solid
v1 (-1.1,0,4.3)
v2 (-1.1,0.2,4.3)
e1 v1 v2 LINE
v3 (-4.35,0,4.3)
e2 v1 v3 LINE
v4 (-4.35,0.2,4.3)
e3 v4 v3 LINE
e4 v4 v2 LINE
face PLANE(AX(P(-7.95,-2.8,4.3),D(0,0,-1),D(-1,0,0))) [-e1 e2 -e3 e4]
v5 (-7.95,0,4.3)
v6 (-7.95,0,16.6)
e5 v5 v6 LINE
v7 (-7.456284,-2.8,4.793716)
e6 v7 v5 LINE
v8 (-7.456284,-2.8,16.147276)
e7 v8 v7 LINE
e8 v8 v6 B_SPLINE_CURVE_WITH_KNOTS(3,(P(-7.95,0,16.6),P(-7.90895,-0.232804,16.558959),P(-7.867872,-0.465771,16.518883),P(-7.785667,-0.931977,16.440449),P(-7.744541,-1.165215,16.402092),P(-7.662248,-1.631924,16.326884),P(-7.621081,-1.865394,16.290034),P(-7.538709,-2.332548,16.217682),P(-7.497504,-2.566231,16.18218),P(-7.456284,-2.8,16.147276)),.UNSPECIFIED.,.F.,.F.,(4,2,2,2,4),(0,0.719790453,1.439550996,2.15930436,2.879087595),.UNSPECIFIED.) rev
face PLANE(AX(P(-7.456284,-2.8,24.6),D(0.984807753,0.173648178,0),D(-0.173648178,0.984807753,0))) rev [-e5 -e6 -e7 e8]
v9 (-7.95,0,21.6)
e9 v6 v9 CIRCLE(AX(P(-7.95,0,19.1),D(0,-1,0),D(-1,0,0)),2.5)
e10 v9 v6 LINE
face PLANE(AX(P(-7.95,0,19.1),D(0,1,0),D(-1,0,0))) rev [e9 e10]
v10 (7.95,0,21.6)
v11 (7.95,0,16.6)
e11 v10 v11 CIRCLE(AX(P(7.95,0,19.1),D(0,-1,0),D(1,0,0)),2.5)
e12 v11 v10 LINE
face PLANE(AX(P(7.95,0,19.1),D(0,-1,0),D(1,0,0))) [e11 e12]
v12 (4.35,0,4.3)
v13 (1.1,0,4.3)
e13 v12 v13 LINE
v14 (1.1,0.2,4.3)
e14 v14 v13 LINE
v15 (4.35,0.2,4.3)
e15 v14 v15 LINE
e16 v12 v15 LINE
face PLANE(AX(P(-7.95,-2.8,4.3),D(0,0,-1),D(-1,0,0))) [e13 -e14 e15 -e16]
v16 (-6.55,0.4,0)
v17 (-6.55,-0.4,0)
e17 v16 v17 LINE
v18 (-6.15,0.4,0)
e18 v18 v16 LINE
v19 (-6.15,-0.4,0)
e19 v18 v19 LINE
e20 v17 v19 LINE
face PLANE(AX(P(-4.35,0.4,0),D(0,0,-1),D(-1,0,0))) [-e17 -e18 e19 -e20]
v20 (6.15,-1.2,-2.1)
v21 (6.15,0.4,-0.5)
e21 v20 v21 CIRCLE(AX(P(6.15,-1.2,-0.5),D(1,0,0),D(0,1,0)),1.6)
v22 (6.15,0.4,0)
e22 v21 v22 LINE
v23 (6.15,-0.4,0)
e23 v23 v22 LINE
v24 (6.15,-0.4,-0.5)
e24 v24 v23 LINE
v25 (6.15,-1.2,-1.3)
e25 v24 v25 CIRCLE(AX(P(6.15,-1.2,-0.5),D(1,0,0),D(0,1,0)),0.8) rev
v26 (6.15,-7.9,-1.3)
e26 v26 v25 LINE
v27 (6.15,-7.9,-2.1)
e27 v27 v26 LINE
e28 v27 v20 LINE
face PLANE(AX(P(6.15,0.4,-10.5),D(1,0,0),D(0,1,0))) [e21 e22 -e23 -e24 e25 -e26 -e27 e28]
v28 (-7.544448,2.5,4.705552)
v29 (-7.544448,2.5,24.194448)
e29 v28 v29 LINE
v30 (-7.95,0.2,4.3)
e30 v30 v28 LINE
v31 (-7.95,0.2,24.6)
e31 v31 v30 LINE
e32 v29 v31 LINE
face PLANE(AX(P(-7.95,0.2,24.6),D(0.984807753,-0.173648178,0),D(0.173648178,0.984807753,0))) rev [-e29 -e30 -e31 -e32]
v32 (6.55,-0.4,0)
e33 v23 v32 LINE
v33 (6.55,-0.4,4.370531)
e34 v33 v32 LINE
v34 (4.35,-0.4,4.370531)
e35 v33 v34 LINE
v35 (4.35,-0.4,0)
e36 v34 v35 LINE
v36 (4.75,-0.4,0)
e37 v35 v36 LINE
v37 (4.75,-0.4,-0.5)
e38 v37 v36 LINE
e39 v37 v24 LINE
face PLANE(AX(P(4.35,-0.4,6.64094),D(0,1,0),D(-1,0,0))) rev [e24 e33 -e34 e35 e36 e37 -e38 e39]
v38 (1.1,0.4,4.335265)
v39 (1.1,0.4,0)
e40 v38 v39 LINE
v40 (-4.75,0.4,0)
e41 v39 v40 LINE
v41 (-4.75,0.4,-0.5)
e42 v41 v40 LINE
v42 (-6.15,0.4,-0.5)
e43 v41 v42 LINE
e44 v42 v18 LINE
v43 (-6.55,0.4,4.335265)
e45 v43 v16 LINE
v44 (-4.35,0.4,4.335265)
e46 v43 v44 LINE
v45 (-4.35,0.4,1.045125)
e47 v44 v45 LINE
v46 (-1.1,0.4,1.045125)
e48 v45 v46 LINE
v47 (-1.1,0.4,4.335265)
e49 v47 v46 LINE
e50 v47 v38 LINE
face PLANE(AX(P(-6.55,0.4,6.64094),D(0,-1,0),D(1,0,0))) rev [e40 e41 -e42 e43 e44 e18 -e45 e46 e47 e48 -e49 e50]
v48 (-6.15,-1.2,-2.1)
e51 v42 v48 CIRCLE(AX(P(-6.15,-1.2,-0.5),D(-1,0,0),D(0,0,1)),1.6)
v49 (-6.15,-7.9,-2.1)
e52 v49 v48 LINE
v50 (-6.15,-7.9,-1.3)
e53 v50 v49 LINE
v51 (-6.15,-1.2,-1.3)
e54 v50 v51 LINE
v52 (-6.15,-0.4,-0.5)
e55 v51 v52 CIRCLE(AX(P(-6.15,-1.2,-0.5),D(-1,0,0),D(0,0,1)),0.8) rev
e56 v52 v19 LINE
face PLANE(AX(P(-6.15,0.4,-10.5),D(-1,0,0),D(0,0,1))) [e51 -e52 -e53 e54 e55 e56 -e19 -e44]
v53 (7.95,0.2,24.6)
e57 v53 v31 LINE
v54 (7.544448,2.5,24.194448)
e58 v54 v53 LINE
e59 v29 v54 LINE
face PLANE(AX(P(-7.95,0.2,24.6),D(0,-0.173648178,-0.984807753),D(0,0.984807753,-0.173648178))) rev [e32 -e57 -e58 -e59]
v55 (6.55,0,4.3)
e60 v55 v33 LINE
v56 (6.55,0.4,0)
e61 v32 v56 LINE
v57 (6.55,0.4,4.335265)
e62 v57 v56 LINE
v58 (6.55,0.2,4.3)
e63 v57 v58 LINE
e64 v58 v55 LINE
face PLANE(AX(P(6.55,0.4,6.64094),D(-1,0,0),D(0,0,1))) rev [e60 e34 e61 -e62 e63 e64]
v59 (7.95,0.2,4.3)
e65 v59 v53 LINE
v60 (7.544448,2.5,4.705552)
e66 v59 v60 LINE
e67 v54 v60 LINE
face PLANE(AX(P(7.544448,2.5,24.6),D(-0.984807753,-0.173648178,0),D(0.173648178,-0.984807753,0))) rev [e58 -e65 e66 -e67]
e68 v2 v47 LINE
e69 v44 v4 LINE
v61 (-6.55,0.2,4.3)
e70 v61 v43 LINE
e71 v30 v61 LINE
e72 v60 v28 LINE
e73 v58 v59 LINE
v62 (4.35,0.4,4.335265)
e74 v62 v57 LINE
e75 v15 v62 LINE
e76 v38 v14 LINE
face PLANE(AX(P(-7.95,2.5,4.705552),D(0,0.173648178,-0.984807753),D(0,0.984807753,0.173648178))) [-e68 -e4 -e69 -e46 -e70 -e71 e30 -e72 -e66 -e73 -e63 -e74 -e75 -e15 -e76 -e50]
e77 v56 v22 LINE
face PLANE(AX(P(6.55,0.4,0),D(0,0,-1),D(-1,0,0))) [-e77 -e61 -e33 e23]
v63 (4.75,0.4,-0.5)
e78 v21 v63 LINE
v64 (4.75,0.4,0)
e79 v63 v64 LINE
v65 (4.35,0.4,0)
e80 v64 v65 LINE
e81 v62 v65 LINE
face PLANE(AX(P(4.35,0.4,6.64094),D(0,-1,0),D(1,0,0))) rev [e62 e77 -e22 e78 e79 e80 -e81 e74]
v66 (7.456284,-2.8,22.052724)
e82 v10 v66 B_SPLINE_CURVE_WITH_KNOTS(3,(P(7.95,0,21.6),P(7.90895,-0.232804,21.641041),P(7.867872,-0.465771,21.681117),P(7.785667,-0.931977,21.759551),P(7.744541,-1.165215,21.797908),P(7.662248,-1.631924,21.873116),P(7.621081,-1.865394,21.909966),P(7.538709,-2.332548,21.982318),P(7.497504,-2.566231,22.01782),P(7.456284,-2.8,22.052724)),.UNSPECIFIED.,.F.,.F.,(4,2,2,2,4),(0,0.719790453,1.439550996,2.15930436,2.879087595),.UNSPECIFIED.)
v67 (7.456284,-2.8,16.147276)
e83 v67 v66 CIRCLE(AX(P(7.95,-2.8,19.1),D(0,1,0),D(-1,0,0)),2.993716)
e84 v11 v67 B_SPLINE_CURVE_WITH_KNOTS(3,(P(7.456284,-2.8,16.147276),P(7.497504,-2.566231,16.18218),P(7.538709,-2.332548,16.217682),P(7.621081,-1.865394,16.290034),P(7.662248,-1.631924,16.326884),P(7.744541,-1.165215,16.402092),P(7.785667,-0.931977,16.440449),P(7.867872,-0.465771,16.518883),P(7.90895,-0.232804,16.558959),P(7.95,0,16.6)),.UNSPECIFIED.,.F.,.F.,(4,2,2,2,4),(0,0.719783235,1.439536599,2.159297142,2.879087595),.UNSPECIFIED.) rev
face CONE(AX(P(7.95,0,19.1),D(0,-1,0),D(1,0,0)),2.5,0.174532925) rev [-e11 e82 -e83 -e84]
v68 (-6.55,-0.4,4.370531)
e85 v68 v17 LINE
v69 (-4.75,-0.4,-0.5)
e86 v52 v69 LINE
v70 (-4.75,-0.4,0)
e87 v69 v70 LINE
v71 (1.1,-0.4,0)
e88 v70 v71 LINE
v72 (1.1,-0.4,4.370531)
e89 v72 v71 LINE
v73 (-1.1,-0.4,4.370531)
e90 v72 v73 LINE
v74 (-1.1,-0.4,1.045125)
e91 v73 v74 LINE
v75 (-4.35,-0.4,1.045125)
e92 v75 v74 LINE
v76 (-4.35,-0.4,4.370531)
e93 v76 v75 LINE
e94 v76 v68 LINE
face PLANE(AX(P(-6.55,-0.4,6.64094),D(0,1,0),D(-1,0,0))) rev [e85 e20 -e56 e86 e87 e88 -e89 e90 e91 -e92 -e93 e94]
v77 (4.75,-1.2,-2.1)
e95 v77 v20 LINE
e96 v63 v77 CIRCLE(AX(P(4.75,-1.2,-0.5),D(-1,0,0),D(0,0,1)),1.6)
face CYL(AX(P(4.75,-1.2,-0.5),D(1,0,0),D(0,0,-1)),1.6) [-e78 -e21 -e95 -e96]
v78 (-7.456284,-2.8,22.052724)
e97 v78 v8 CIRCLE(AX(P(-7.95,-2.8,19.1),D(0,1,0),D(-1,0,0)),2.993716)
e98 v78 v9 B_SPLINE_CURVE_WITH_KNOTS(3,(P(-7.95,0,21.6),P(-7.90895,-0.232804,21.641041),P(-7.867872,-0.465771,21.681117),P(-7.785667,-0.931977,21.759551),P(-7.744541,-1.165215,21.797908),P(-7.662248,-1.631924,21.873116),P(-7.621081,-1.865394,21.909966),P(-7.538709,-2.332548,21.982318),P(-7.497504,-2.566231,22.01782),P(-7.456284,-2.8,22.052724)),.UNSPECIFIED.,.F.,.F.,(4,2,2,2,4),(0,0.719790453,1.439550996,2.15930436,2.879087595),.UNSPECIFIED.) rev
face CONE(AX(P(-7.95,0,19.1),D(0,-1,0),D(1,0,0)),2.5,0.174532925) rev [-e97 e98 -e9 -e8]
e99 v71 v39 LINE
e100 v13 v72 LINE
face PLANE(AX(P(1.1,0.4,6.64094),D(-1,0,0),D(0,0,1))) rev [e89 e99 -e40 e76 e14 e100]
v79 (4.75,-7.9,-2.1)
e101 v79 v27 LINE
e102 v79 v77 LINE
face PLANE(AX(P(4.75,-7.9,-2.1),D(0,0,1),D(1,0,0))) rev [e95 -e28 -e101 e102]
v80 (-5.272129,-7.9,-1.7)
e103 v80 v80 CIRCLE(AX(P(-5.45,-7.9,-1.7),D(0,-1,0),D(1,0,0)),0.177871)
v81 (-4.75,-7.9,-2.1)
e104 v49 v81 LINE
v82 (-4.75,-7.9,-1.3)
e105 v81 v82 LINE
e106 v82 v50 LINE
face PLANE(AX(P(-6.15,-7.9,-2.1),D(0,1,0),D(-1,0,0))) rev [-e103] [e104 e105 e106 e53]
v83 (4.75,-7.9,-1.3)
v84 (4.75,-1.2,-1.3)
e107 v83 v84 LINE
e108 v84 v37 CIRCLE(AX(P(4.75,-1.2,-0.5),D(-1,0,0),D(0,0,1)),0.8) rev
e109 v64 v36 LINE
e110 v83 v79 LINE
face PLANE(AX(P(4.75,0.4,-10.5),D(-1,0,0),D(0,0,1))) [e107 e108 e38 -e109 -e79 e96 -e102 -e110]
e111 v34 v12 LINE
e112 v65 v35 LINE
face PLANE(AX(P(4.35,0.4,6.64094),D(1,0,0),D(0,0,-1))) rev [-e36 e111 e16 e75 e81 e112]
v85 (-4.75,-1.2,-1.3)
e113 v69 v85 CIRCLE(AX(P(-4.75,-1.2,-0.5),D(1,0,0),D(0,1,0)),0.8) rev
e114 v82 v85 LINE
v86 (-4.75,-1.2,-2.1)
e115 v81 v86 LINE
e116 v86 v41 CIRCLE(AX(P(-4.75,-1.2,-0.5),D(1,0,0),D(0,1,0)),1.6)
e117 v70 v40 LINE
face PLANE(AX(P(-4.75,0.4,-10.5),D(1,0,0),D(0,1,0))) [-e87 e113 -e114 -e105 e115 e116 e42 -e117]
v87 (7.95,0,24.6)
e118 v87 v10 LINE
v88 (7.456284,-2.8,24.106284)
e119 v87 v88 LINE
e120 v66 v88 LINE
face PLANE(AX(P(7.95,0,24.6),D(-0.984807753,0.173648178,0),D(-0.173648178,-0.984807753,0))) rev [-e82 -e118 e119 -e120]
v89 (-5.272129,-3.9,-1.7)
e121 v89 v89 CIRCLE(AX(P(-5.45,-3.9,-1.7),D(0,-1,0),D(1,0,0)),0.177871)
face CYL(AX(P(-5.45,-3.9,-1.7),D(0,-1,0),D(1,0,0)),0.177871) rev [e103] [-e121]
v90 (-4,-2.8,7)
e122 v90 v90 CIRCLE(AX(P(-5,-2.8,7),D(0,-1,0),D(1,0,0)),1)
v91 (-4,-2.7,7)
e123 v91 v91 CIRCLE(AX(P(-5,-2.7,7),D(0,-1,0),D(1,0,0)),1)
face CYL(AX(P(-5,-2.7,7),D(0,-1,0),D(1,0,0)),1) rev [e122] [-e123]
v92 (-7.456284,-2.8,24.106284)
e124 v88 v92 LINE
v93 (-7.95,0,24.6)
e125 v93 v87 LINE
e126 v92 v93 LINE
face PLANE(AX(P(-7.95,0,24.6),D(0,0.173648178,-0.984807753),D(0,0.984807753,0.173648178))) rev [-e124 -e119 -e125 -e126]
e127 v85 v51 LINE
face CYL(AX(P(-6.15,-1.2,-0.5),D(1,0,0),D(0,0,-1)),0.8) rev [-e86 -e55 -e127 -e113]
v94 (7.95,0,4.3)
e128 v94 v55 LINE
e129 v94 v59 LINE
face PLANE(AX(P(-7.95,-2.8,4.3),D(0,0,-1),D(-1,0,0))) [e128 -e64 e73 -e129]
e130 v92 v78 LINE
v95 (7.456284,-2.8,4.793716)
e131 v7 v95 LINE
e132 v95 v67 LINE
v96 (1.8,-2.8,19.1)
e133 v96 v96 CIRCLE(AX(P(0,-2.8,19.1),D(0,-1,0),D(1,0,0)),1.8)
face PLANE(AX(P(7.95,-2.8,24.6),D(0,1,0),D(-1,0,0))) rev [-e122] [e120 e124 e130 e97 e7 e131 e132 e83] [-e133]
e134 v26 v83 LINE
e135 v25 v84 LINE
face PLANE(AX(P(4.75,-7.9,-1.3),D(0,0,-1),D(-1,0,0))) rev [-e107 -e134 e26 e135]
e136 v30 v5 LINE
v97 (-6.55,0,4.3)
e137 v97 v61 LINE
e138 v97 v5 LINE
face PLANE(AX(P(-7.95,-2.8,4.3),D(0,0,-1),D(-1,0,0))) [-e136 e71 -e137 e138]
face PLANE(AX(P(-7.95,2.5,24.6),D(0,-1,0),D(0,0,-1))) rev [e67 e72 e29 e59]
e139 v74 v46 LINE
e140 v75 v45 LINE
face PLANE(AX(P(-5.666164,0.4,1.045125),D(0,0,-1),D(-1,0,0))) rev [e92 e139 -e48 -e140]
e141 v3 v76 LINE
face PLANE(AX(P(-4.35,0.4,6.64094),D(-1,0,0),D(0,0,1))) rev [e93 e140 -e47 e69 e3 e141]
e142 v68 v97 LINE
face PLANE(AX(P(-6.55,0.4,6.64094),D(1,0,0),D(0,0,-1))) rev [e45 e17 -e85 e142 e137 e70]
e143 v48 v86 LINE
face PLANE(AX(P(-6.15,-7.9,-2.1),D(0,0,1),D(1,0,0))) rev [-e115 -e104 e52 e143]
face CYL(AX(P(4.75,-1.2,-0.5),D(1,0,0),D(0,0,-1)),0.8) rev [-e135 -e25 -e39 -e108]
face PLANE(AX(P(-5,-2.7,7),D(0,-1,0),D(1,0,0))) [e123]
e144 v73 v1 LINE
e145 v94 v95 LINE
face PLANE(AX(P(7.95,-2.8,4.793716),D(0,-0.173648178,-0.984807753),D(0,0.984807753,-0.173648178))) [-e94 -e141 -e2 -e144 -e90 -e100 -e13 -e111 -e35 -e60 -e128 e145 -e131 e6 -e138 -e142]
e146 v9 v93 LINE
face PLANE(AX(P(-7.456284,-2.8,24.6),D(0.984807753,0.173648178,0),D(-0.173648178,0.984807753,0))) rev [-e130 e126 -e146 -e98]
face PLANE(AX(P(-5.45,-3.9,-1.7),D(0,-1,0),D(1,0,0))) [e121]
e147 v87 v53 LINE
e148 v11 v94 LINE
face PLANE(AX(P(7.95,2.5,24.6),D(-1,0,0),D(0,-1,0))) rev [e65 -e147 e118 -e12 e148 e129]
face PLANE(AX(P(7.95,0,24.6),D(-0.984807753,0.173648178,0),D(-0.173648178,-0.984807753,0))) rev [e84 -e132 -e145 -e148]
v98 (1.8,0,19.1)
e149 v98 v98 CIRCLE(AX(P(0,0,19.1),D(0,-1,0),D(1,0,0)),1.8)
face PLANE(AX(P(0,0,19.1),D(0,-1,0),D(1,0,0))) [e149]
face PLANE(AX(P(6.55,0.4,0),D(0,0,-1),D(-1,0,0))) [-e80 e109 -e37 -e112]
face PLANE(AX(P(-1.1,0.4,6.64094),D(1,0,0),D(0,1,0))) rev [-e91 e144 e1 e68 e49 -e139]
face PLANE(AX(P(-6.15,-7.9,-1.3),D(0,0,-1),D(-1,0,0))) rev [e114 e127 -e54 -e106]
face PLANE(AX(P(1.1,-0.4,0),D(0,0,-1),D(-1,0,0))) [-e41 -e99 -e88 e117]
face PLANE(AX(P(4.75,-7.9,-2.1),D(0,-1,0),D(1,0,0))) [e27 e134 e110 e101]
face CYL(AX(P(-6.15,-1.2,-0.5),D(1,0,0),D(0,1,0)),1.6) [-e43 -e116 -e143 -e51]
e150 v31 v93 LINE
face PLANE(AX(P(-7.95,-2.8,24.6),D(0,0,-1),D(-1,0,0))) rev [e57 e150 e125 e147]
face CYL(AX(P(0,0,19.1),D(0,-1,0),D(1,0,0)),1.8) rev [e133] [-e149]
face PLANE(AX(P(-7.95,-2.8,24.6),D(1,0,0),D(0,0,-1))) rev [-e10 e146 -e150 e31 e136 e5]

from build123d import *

# Parameters (mm, degrees)
SKETCH_3_W          = 15.9
SKETCH_3_H          = 5.3
EXTRUDE_1_DEPTH     = 20.3
SKETCH_4_W          = 2.2
SKETCH_4_H          = 0.8
EXTRUDE_2_DEPTH     = 4.3
SKETCH_6_W          = 1.4
SKETCH_6_H          = 0.8
EXTRUDE_3_DEPTH     = 10.5
SKETCH_7_R          = 1.8
CUT_EXTRUDE_1_DEPTH = 2.8
SKETCH_8_R          = 1
CUT_EXTRUDE_2_DEPTH = 0.1
CHAMFER_1_SIZE      = 2.8
CHAMFER_1_SIZE_2    = 0.493715546
CHAMFER_2_SIZE      = 0.405552056
CHAMFER_2_SIZE_2    = 2.3
SKETCH_9_W          = 1.4
SKETCH_9_H          = 0.8
CUT_EXTRUDE_3_DEPTH = 10.5
SKETCH_10_W         = 1.045125196
SKETCH_10_H         = 0.8
EXTRUDE_4_DEPTH     = 3.25
SKETCH_11_W         = 1.4
SKETCH_11_H         = 0.8
EXTRUDE_5_DEPTH     = 7.5
SKETCH_12_W         = 1.4
SKETCH_12_H         = 0.8
CUT_EXTRUDE_4_DEPTH = 8.4
FILLET_1_R          = 0.8
FILLET_2_R          = 1.6
SKETCH_13_R         = 0.177871301
CUT_EXTRUDE_5_DEPTH = 4


with BuildPart() as part:
    # Эскиз3 → Вытянуть1 (new body)
    with BuildSketch(Plane.XY.offset(4.3)):
        with Locations((0, -0.15)):
            Rectangle(SKETCH_3_W, SKETCH_3_H)
    extrude(amount=EXTRUDE_1_DEPTH)

    # Эскиз4 → Вытянуть2 (add)
    with BuildSketch(Plane.XY):
        Rectangle(SKETCH_4_W, SKETCH_4_H)
        with Locations((-5.45, 0)):
            Rectangle(SKETCH_4_W, SKETCH_4_H)
        with Locations((5.45, 0)):
            Rectangle(SKETCH_4_W, SKETCH_4_H)
    extrude(amount=EXTRUDE_2_DEPTH)

    # Эскиз6 → Вытянуть3 (add)
    with BuildSketch(Plane.XY):
        Rectangle(SKETCH_6_W, SKETCH_6_H)
        with Locations((-5.45, 0)):
            Rectangle(SKETCH_6_W, SKETCH_6_H)
        with Locations((5.45, 0)):
            Rectangle(SKETCH_6_W, SKETCH_6_H)
    extrude(amount=-EXTRUDE_3_DEPTH)

    # Эскиз7 → Вырез-Вытянуть1 (cut)
    with BuildSketch(Plane.XZ.offset(2.8)):
        with Locations((0, 19.1)):
            Circle(SKETCH_7_R)
        with BuildLine():
            Line((7.95, 16.6), (7.95, 21.6))
            ThreePointArc((7.95, 21.6), (5.45, 19.1), (7.95, 16.6))
        make_face()
        with BuildLine():
            Line((-7.95, 16.6), (-7.95, 21.6))
            ThreePointArc((-7.95, 21.6), (-5.45, 19.1), (-7.95, 16.6))
        make_face()
    extrude(amount=-CUT_EXTRUDE_1_DEPTH, mode=Mode.SUBTRACT)

    # Эскиз8 → Вырез-Вытянуть2 (cut)
    with BuildSketch(Plane.XZ.offset(2.8)):
        with Locations((-5, 7)):
            Circle(SKETCH_8_R)
    extrude(amount=-CUT_EXTRUDE_2_DEPTH, mode=Mode.SUBTRACT)

    # Фаска1
    # the kernel refuses this chamfer: 2.8, 0.493715546 mm, written as the material it takes off along each edge
    with BuildSketch(Plane(origin=(15.22590863, -2.8, 4.3), x_dir=(0, 0.9999776716360547, -0.006682531656101734), z_dir=(-1, 0, 0))) as chamfer_1_piece_1_section:
        Polygon((CHAMFER_1_SIZE * 0.999977671636, -CHAMFER_1_SIZE * 0.0066825316561), (-CHAMFER_1_SIZE_2 * 0.00668253165588, -CHAMFER_1_SIZE_2 * 0.999977671603), (0, 0), align=None)
    chamfer_1_piece_1 = extrude(amount=30.45181726, mode=Mode.PRIVATE)
    chamfer_1_piece_1 = split(chamfer_1_piece_1, bisect_by=Plane(origin=(6.55, -0.266666667, 4.323510264), z_dir=(1, 0, 0)), keep=Keep.TOP, mode=Mode.PRIVATE)
    add(chamfer_1_piece_1, mode=Mode.SUBTRACT)
    with BuildSketch(Plane(origin=(15.22590863, -2.8, 4.3), x_dir=(0, 0.9999776716360547, -0.006682531656101734), z_dir=(-1, 0, 0))) as chamfer_1_piece_2_section:
        Polygon((CHAMFER_1_SIZE * 0.999977671636, -CHAMFER_1_SIZE * 0.0066825316561), (-CHAMFER_1_SIZE_2 * 0.00668253165588, -CHAMFER_1_SIZE_2 * 0.999977671603), (0, 0), align=None)
    chamfer_1_piece_2 = extrude(amount=30.45181726, mode=Mode.PRIVATE)
    chamfer_1_piece_2 = split(chamfer_1_piece_2, bisect_by=Plane(origin=(5.45, -0.4, 4.467510632), z_dir=(0, -1, 0)), keep=Keep.TOP, mode=Mode.PRIVATE)
    add(chamfer_1_piece_2, mode=Mode.SUBTRACT)
    with BuildSketch(Plane(origin=(15.22590863, -2.8, 4.3), x_dir=(0, 0.9999776716360547, -0.006682531656101734), z_dir=(-1, 0, 0))) as chamfer_1_piece_3_section:
        Polygon((CHAMFER_1_SIZE * 0.999977671636, -CHAMFER_1_SIZE * 0.0066825316561), (-CHAMFER_1_SIZE_2 * 0.00668253165588, -CHAMFER_1_SIZE_2 * 0.999977671603), (0, 0), align=None)
    chamfer_1_piece_3 = extrude(amount=30.45181726, mode=Mode.PRIVATE)
    chamfer_1_piece_3 = split(chamfer_1_piece_3, bisect_by=Plane(origin=(4.35, -0.266666667, 4.323510264), z_dir=(-1, 0, 0)), keep=Keep.TOP, mode=Mode.PRIVATE)
    chamfer_1_piece_3 = split(chamfer_1_piece_3, bisect_by=Plane(origin=(1.1, -0.266666667, 4.323510264), z_dir=(1, 0, 0)), keep=Keep.TOP, mode=Mode.PRIVATE)
    add(chamfer_1_piece_3, mode=Mode.SUBTRACT)
    with BuildSketch(Plane(origin=(15.22590863, -2.8, 4.3), x_dir=(0, 0.9999776716360547, -0.006682531656101734), z_dir=(-1, 0, 0))) as chamfer_1_piece_4_section:
        Polygon((CHAMFER_1_SIZE * 0.999977671636, -CHAMFER_1_SIZE * 0.0066825316561), (-CHAMFER_1_SIZE_2 * 0.00668253165588, -CHAMFER_1_SIZE_2 * 0.999977671603), (0, 0), align=None)
    chamfer_1_piece_4 = extrude(amount=30.45181726, mode=Mode.PRIVATE)
    chamfer_1_piece_4 = split(chamfer_1_piece_4, bisect_by=Plane(origin=(-4.35, -0.266666667, 4.323510264), z_dir=(1, 0, 0)), keep=Keep.TOP, mode=Mode.PRIVATE)
    chamfer_1_piece_4 = split(chamfer_1_piece_4, bisect_by=Plane(origin=(-1.1, -0.266666667, 4.323510264), z_dir=(-1, 0, 0)), keep=Keep.TOP, mode=Mode.PRIVATE)
    add(chamfer_1_piece_4, mode=Mode.SUBTRACT)
    with BuildSketch(Plane(origin=(15.22590863, -2.8, 4.3), x_dir=(0, 0.9999776716360547, -0.006682531656101734), z_dir=(-1, 0, 0))) as chamfer_1_piece_5_section:
        Polygon((CHAMFER_1_SIZE * 0.999977671636, -CHAMFER_1_SIZE * 0.0066825316561), (-CHAMFER_1_SIZE_2 * 0.00668253165588, -CHAMFER_1_SIZE_2 * 0.999977671603), (0, 0), align=None)
    chamfer_1_piece_5 = extrude(amount=30.45181726, mode=Mode.PRIVATE)
    chamfer_1_piece_5 = split(chamfer_1_piece_5, bisect_by=Plane(origin=(-6.55, -0.266666667, 4.323510264), z_dir=(-1, 0, 0)), keep=Keep.TOP, mode=Mode.PRIVATE)
    add(chamfer_1_piece_5, mode=Mode.SUBTRACT)
    with BuildSketch(Plane(origin=(-7.95, -2.8, -2.97590863), x_dir=(-0.006682531656101734, 0.9999776716360547, 0), z_dir=(0, 0, 1))) as chamfer_1_piece_6:
        Polygon((CHAMFER_1_SIZE * 0.999977671636, -CHAMFER_1_SIZE * 0.0066825316561), (-CHAMFER_1_SIZE_2 * 0.00668253165588, -CHAMFER_1_SIZE_2 * 0.999977671603), (0, 0), align=None)
    extrude(amount=26.85181726, mode=Mode.SUBTRACT)
    with BuildSketch(Plane(origin=(-7.95, -2.8, 14.32409137), x_dir=(-0.006682531656101734, 0.9999776716360547, 0), z_dir=(0, 0, 1))) as chamfer_1_piece_7:
        Polygon((CHAMFER_1_SIZE * 0.999977671636, -CHAMFER_1_SIZE * 0.0066825316561), (-CHAMFER_1_SIZE_2 * 0.00668253165588, -CHAMFER_1_SIZE_2 * 0.999977671603), (0, 0), align=None)
    extrude(amount=17.55181726, mode=Mode.SUBTRACT)
    with BuildSketch(Plane(origin=(-7.95, -2.8, 19.1), x_dir=(-0.9999950652018581, 0, 0.0031415874858794286), z_dir=(-0.0031415874858794286, 0, -0.9999950652018581))) as chamfer_1_piece_8:
        Polygon((2.5 + CHAMFER_1_SIZE_2, 0), (2.5, CHAMFER_1_SIZE), (2.5, 0), align=None)
    revolve(axis=Axis((-7.95, -2.8, 19.1), (0, 1, 0)), revolution_arc=359.64, mode=Mode.SUBTRACT)
    with BuildSketch(Plane(origin=(15.22590863, -2.8, 24.6), x_dir=(0, 0.9999776716360547, 0.006682531656101123), z_dir=(-1, 0, 0))) as chamfer_1_piece_9:
        Polygon((CHAMFER_1_SIZE * 0.999977671636, CHAMFER_1_SIZE * 0.0066825316561), (-CHAMFER_1_SIZE_2 * 0.00668253165588, CHAMFER_1_SIZE_2 * 0.999977671603), (0, 0), align=None)
    extrude(amount=30.45181726, mode=Mode.SUBTRACT)
    with BuildSketch(Plane(origin=(7.95, -2.8, 14.32409137), x_dir=(-0.9776715712462587, -0.21013876076743054, 0), z_dir=(0, 0, 1))) as chamfer_1_piece_10:
        Polygon((CHAMFER_1_SIZE_2 * 0.977671571214, -CHAMFER_1_SIZE_2 * 0.21013876076), (-CHAMFER_1_SIZE * 0.210138760767, -CHAMFER_1_SIZE * 0.977671571246), (0, 0), align=None)
    extrude(amount=17.55181726, mode=Mode.SUBTRACT)
    with BuildSketch(Plane(origin=(7.95, -2.8, -2.97590863), x_dir=(-0.9776715712462587, -0.21013876076743054, 0), z_dir=(0, 0, 1))) as chamfer_1_piece_11:
        Polygon((CHAMFER_1_SIZE_2 * 0.977671571214, -CHAMFER_1_SIZE_2 * 0.21013876076), (-CHAMFER_1_SIZE * 0.210138760767, -CHAMFER_1_SIZE * 0.977671571246), (0, 0), align=None)
    extrude(amount=26.85181726, mode=Mode.SUBTRACT)
    with BuildSketch(Plane(origin=(7.95, -2.8, 19.1), x_dir=(0.9999950652018581, 0, 0.0031415874858794286), z_dir=(0.0031415874858794286, 0, -0.9999950652018581))) as chamfer_1_piece_12:
        Polygon((2.5 + CHAMFER_1_SIZE_2, 0), (2.5, -CHAMFER_1_SIZE), (2.5, 0), align=None)
    revolve(axis=Axis((7.95, -2.8, 19.1), (0, -1, 0)), revolution_arc=359.64, mode=Mode.SUBTRACT)

    # Фаска2
    # the kernel refuses this chamfer: 2.3, 0.405552056 mm, written as the material it takes off along each edge
    with BuildSketch(Plane(origin=(7.95, 2.5, -1.676639232), x_dir=(-0.9776715712462586, 0.21013876076743143, 0), z_dir=(0, 0, 1))) as chamfer_2_piece_1:
        Polygon((CHAMFER_2_SIZE * 0.977671570353, CHAMFER_2_SIZE * 0.210138760575), (-CHAMFER_2_SIZE_2 * 0.210138760767, CHAMFER_2_SIZE_2 * 0.977671571246), (0, 0), align=None)
    extrude(amount=32.253278464, mode=Mode.SUBTRACT)
    with BuildSketch(Plane(origin=(-13.926639232, 2.5, 24.6), x_dir=(0, -0.9999776716360546, 0.0066825316561023975), z_dir=(1, 0, 0))) as chamfer_2_piece_2:
        Polygon((CHAMFER_2_SIZE_2 * 0.999977671636, CHAMFER_2_SIZE_2 * 0.0066825316561), (-CHAMFER_2_SIZE * 0.00668253165, CHAMFER_2_SIZE * 0.999977670722), (0, 0), align=None)
    extrude(amount=27.853278464, mode=Mode.SUBTRACT)
    with BuildSketch(Plane(origin=(-7.95, 2.5, -1.676639232), x_dir=(-0.006682531656101655, -0.9999776716360548, 0), z_dir=(0, 0, 1))) as chamfer_2_piece_3:
        Polygon((CHAMFER_2_SIZE_2 * 0.999977671636, CHAMFER_2_SIZE_2 * 0.0066825316561), (-CHAMFER_2_SIZE * 0.00668253165, CHAMFER_2_SIZE * 0.999977670722), (0, 0), align=None)
    extrude(amount=32.253278464, mode=Mode.SUBTRACT)
    with BuildSketch(Plane(origin=(-13.926639232, 2.5, 4.3), x_dir=(0, -0.9999776716360546, -0.006682531656101654), z_dir=(1, 0, 0))) as chamfer_2_piece_4_section:
        Polygon((CHAMFER_2_SIZE_2 * 0.999977671636, -CHAMFER_2_SIZE_2 * 0.0066825316561), (-CHAMFER_2_SIZE * 0.00668253165, -CHAMFER_2_SIZE * 0.999977670722), (0, 0), align=None)
    chamfer_2_piece_4 = extrude(amount=27.853278464, mode=Mode.PRIVATE)
    chamfer_2_piece_4 = split(chamfer_2_piece_4, bisect_by=Plane(origin=(-6.55, 0.333333333, 4.311755132), z_dir=(-1, 0, 0)), keep=Keep.TOP, mode=Mode.PRIVATE)
    add(chamfer_2_piece_4, mode=Mode.SUBTRACT)
    with BuildSketch(Plane(origin=(-13.926639232, 2.5, 4.3), x_dir=(0, -0.9999776716360546, -0.006682531656101654), z_dir=(1, 0, 0))) as chamfer_2_piece_5_section:
        Polygon((CHAMFER_2_SIZE_2 * 0.999977671636, -CHAMFER_2_SIZE_2 * 0.0066825316561), (-CHAMFER_2_SIZE * 0.00668253165, -CHAMFER_2_SIZE * 0.999977670722), (0, 0), align=None)
    chamfer_2_piece_5 = extrude(amount=27.853278464, mode=Mode.PRIVATE)
    chamfer_2_piece_5 = split(chamfer_2_piece_5, bisect_by=Plane(origin=(-5.45, 0.4, 4.436124429), z_dir=(0, 1, 0)), keep=Keep.TOP, mode=Mode.PRIVATE)
    add(chamfer_2_piece_5, mode=Mode.SUBTRACT)
    with BuildSketch(Plane(origin=(-13.926639232, 2.5, 4.3), x_dir=(0, -0.9999776716360546, -0.006682531656101654), z_dir=(1, 0, 0))) as chamfer_2_piece_6_section:
        Polygon((CHAMFER_2_SIZE_2 * 0.999977671636, -CHAMFER_2_SIZE_2 * 0.0066825316561), (-CHAMFER_2_SIZE * 0.00668253165, -CHAMFER_2_SIZE * 0.999977670722), (0, 0), align=None)
    chamfer_2_piece_6 = extrude(amount=27.853278464, mode=Mode.PRIVATE)
    chamfer_2_piece_6 = split(chamfer_2_piece_6, bisect_by=Plane(origin=(-4.35, 0.333333333, 4.311755132), z_dir=(1, 0, 0)), keep=Keep.TOP, mode=Mode.PRIVATE)
    chamfer_2_piece_6 = split(chamfer_2_piece_6, bisect_by=Plane(origin=(-1.1, 0.333333333, 4.311755132), z_dir=(-1, 0, 0)), keep=Keep.TOP, mode=Mode.PRIVATE)
    add(chamfer_2_piece_6, mode=Mode.SUBTRACT)
    with BuildSketch(Plane(origin=(-13.926639232, 2.5, 4.3), x_dir=(0, -0.9999776716360546, -0.006682531656101654), z_dir=(1, 0, 0))) as chamfer_2_piece_7_section:
        Polygon((CHAMFER_2_SIZE_2 * 0.999977671636, -CHAMFER_2_SIZE_2 * 0.0066825316561), (-CHAMFER_2_SIZE * 0.00668253165, -CHAMFER_2_SIZE * 0.999977670722), (0, 0), align=None)
    chamfer_2_piece_7 = extrude(amount=27.853278464, mode=Mode.PRIVATE)
    chamfer_2_piece_7 = split(chamfer_2_piece_7, bisect_by=Plane(origin=(1.1, 0.333333333, 4.311755132), z_dir=(1, 0, 0)), keep=Keep.TOP, mode=Mode.PRIVATE)
    chamfer_2_piece_7 = split(chamfer_2_piece_7, bisect_by=Plane(origin=(4.35, 0.333333333, 4.311755132), z_dir=(-1, 0, 0)), keep=Keep.TOP, mode=Mode.PRIVATE)
    add(chamfer_2_piece_7, mode=Mode.SUBTRACT)
    with BuildSketch(Plane(origin=(-13.926639232, 2.5, 4.3), x_dir=(0, -0.9999776716360546, -0.006682531656101654), z_dir=(1, 0, 0))) as chamfer_2_piece_8_section:
        Polygon((CHAMFER_2_SIZE_2 * 0.999977671636, -CHAMFER_2_SIZE_2 * 0.0066825316561), (-CHAMFER_2_SIZE * 0.00668253165, -CHAMFER_2_SIZE * 0.999977670722), (0, 0), align=None)
    chamfer_2_piece_8 = extrude(amount=27.853278464, mode=Mode.PRIVATE)
    chamfer_2_piece_8 = split(chamfer_2_piece_8, bisect_by=Plane(origin=(6.55, 0.333333333, 4.311755132), z_dir=(1, 0, 0)), keep=Keep.TOP, mode=Mode.PRIVATE)
    add(chamfer_2_piece_8, mode=Mode.SUBTRACT)

    # Эскиз9 → Вырез-Вытянуть3 (cut)
    with BuildSketch(Plane(origin=(0, 0, -10.5), x_dir=(-1, 0, 0), z_dir=(0, 0, -1))):
        Rectangle(SKETCH_9_W, SKETCH_9_H)
    extrude(amount=-CUT_EXTRUDE_3_DEPTH, mode=Mode.SUBTRACT)

    # Эскиз10 → Вытянуть4 (add)
    with BuildSketch(Plane.ZY.offset(1.1)):
        with Locations((0.522562598, 0)):
            Rectangle(SKETCH_10_W, SKETCH_10_H)
    extrude(amount=EXTRUDE_4_DEPTH)

    # Эскиз11 → Вытянуть5 (add)
    with BuildSketch(Plane.XZ.offset(0.4)):
        with Locations((-5.45, -1.7)):
            Rectangle(SKETCH_11_W, SKETCH_11_H)
        with Locations((5.45, -1.7)):
            Rectangle(SKETCH_11_W, SKETCH_11_H)
    extrude(amount=EXTRUDE_5_DEPTH)

    # Эскиз12 → Вырез-Вытянуть4 (cut)
    with BuildSketch(Plane(origin=(0, 0, -10.5), x_dir=(-1, 0, 0), z_dir=(0, 0, -1))):
        with Locations((5.45, 0)):
            Rectangle(SKETCH_12_W, SKETCH_12_H)
        with Locations((-5.45, 0)):
            Rectangle(SKETCH_12_W, SKETCH_12_H)
    extrude(amount=-CUT_EXTRUDE_4_DEPTH, mode=Mode.SUBTRACT)

    # Скругление1
    fillet_1_edges = [part.edges().sort_by_distance(p)[0] for p in [
        (5.45, -0.4, -1.3),
        (-5.45, -0.4, -1.3),
    ]]
    fillet(fillet_1_edges, radius=FILLET_1_R)

    # Скругление2
    fillet_2_edges = [part.edges().sort_by_distance(p)[0] for p in [
        (5.45, 0.4, -2.1),
        (-5.45, 0.4, -2.1),
    ]]
    fillet(fillet_2_edges, radius=FILLET_2_R)

    # Эскиз13 → Вырез-Вытянуть5 (cut)
    with BuildSketch(Plane.XZ.offset(7.9)):
        with Locations((-5.45, -1.7)):
            Circle(SKETCH_13_R)
    extrude(amount=-CUT_EXTRUDE_5_DEPTH, mode=Mode.SUBTRACT)


solid = part.part
